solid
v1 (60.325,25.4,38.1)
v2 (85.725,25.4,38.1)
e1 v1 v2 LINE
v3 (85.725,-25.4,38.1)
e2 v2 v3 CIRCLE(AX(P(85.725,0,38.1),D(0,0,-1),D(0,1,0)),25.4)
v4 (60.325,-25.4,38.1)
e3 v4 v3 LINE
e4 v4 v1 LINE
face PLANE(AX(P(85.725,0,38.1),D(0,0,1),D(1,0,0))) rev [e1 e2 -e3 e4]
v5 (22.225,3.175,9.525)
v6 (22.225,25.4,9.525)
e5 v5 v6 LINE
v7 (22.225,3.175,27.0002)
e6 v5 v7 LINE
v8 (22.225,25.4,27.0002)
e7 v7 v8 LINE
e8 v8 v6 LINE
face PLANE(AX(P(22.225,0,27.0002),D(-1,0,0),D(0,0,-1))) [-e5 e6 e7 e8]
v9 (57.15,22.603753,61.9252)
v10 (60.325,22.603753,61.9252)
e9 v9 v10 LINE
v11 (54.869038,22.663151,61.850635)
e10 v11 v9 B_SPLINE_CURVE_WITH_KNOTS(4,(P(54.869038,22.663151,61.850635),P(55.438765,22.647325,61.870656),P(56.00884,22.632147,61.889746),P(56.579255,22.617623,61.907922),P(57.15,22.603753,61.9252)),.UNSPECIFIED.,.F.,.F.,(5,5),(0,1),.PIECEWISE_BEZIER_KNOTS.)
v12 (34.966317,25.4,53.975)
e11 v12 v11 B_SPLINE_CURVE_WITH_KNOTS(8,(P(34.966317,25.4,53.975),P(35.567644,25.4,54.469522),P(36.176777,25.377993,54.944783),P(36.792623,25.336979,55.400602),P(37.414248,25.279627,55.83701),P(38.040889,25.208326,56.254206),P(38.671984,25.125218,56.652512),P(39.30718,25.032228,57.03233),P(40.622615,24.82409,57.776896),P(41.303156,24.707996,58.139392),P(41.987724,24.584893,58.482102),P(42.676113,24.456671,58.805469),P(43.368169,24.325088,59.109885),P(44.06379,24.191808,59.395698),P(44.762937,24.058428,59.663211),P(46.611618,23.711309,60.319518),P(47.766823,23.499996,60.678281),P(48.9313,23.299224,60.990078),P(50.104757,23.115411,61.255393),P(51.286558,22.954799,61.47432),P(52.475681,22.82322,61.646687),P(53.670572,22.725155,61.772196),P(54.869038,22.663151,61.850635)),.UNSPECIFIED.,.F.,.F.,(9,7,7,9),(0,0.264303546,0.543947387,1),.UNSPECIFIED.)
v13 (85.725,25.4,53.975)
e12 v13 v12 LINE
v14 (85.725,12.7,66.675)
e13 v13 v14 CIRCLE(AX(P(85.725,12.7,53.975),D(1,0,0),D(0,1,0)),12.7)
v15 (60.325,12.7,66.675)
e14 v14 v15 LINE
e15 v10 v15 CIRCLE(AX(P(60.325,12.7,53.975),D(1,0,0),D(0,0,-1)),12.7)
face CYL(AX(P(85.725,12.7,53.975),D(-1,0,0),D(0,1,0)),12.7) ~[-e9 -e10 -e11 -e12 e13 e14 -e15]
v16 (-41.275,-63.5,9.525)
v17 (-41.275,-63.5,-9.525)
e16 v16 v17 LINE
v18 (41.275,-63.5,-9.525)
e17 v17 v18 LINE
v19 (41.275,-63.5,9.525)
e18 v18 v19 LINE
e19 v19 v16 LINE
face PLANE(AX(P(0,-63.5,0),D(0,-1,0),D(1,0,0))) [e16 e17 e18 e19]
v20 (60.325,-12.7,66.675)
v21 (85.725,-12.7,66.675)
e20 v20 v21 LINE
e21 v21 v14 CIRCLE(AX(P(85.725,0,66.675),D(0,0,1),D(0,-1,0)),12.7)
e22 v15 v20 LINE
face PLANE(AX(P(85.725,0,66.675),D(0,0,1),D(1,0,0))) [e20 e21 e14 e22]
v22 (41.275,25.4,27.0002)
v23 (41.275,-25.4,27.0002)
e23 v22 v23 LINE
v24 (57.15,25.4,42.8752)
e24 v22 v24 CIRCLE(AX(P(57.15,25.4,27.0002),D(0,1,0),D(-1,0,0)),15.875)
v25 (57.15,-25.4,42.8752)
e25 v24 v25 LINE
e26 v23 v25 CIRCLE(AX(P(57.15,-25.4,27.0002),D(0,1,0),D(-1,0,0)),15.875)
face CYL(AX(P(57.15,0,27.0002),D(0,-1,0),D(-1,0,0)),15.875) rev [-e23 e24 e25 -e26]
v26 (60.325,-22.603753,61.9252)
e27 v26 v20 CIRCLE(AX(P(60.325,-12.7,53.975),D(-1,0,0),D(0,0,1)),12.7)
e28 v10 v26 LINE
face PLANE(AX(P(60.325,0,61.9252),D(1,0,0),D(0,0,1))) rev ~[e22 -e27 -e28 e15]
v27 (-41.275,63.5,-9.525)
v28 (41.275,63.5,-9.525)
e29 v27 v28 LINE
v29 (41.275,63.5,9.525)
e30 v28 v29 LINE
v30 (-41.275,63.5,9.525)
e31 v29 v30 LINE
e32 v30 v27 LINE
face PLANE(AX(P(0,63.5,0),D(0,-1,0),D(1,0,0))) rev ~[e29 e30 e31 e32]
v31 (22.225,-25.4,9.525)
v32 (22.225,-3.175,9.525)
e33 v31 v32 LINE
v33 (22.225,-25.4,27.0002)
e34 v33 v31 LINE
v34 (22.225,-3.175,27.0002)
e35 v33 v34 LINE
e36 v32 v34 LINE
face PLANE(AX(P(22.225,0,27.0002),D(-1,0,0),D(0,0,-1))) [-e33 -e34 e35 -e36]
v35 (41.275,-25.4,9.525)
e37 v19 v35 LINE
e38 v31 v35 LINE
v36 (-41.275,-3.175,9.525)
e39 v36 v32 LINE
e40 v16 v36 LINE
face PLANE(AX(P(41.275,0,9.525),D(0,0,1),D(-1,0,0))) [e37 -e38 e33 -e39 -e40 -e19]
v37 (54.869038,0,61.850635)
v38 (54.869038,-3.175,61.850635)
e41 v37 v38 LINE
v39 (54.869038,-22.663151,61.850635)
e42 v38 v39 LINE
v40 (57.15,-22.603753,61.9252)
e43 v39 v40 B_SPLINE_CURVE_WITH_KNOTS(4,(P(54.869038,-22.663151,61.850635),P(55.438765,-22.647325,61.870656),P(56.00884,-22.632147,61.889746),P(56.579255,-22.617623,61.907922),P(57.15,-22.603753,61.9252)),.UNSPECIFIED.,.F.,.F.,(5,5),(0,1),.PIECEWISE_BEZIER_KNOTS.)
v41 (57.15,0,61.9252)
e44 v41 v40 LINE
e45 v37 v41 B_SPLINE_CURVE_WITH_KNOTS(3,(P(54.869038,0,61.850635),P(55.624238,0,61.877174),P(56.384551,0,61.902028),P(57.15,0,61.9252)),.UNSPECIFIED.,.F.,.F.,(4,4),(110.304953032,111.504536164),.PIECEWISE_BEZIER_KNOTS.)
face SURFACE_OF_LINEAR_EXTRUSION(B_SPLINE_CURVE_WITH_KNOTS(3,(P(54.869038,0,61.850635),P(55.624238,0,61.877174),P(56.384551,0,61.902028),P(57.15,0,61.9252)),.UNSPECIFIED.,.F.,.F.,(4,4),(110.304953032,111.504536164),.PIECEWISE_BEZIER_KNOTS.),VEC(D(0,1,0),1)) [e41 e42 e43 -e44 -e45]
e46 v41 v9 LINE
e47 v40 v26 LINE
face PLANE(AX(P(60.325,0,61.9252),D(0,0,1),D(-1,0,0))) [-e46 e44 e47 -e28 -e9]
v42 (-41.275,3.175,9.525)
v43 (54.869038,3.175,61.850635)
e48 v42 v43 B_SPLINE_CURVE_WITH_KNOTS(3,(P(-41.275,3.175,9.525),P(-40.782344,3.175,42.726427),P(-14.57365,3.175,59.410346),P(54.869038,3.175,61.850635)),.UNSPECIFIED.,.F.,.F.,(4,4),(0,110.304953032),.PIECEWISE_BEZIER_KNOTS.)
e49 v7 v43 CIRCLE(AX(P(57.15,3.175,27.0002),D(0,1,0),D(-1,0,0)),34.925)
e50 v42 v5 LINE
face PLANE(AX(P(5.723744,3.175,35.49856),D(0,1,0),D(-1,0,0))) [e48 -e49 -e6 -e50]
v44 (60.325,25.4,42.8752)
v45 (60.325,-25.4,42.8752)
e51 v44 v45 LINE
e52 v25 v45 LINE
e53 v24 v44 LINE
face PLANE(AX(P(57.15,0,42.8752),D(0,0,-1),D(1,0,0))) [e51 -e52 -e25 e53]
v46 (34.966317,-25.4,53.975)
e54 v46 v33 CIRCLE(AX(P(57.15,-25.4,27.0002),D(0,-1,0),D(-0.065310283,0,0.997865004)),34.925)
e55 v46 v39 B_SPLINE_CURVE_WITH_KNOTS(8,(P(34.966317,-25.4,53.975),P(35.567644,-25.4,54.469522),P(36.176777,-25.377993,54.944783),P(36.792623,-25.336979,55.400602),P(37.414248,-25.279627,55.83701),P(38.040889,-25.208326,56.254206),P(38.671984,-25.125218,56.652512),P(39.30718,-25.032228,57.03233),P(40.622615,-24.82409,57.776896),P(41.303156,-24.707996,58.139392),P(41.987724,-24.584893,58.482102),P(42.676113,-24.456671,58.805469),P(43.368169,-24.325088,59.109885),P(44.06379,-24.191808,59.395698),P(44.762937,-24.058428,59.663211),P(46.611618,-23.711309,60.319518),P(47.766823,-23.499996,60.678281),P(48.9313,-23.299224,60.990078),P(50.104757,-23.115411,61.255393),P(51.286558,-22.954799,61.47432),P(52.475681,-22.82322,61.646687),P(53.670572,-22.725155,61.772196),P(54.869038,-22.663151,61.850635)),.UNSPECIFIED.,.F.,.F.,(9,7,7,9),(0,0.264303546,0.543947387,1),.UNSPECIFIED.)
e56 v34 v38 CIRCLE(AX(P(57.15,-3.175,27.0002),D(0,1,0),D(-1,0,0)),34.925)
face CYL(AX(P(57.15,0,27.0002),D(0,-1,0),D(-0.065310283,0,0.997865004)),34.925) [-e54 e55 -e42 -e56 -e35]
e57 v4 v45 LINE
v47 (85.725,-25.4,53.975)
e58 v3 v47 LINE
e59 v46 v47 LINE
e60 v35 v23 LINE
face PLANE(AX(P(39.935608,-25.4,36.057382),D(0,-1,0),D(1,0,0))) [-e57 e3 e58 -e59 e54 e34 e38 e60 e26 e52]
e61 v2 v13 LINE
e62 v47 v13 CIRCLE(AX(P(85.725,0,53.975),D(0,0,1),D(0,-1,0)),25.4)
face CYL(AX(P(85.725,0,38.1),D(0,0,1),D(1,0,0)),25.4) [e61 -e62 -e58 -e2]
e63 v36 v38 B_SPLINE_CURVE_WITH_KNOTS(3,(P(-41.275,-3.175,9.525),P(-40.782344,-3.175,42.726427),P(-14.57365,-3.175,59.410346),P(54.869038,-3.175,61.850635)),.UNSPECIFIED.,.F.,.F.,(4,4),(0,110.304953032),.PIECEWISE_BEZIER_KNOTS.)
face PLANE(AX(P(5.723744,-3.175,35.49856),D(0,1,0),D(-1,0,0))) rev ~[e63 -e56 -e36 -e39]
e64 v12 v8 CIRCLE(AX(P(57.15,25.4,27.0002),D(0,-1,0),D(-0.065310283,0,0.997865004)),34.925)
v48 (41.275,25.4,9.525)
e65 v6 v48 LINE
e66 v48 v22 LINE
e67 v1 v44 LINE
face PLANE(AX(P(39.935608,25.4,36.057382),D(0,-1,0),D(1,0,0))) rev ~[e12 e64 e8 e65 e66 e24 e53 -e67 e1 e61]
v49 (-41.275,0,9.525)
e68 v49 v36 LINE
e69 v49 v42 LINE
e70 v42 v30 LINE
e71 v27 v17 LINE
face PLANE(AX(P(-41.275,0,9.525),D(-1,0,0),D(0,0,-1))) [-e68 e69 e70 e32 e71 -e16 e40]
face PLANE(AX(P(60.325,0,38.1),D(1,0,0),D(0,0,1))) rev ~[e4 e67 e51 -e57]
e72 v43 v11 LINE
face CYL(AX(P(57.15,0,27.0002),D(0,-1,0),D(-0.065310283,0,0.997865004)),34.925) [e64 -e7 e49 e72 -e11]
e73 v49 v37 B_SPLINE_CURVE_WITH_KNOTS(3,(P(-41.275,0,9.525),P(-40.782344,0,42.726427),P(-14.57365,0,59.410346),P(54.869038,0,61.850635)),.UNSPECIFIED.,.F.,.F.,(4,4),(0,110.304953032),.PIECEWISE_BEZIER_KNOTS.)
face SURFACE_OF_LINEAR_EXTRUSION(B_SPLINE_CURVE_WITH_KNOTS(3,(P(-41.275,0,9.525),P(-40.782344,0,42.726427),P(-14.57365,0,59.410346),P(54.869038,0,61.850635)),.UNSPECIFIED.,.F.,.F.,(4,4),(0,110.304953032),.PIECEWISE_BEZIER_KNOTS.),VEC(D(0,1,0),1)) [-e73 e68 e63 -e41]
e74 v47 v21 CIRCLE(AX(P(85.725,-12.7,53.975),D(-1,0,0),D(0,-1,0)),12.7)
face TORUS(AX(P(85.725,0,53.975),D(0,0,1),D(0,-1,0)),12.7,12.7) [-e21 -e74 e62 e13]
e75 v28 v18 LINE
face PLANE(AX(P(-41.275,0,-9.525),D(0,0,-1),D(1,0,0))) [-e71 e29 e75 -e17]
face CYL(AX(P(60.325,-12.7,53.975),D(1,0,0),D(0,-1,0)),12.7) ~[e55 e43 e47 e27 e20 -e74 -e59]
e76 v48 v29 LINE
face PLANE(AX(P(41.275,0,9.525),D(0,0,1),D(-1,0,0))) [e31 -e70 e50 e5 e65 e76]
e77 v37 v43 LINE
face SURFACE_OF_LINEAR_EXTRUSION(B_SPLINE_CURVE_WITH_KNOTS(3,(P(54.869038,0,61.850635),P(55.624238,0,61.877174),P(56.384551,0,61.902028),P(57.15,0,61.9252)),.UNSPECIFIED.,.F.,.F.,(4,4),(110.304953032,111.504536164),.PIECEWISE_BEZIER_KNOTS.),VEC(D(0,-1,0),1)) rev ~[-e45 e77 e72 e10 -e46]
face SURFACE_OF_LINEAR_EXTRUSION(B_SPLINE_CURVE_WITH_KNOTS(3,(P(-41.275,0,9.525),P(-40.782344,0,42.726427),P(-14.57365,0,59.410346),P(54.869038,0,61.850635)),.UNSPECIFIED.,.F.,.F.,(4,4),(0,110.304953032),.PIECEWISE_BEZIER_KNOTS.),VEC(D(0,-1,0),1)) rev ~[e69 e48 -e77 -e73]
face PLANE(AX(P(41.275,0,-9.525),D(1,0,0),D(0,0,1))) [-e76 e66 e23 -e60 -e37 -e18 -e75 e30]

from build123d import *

# Parameters (mm, degrees)
F1_DEPTH = 63.5
F0_W     = 25.4
F0_H     = 19.05
F0_H_2   = 4.7498
F0_H_3   = 4.7752
F2_DEPTH = 25.4
F4_DEPTH = 3.175
F5_R     = 12.7


with BuildPart() as f1:
    # F0 (on Front) → F1 (new body, symmetric)
    with BuildSketch(Plane.XZ):
        Polygon((-41.275, 9.525), (-41.275, -9.525), (41.275, -9.525), (41.275, 9.525), (22.225, 9.525), align=None)
    extrude(amount=F1_DEPTH, both=True)

    # F0 (on Front) → F2 (join, symmetric)
    with BuildSketch(Plane.XZ):
        with BuildLine():
            Line((22.225, 9.525), (41.275, 9.525))
            Line((41.275, 9.525), (41.275, 27.0002))
            ThreePointArc((41.275, 27.0002), (45.9246798487, 38.2255201513), (57.15, 42.8752))
            Line((57.15, 42.8752), (60.325, 42.8752))
            Line((60.325, 42.8752), (60.325, 61.9252))
            Line((60.325, 61.9252), (57.15, 61.9252))
            add(Edge.make_bspline(
                [(54.8690383613, 61.8506352771), (55.6242381587, 61.8771737888), (56.3845511944, 61.9020277216), (57.15, 61.9252)],
                knots=[110.3049530316, 110.3049530316, 110.3049530316, 110.3049530316, 111.5045361635, 111.5045361635, 111.5045361635, 111.5045361635], degree=3))
            ThreePointArc((54.8690383613, 61.8506352771), (31.6606079885, 50.8758470045), (22.225, 27.0002))
            Line((22.225, 27.0002), (22.225, 9.525))
        make_face()
        with Locations((73.025, 52.4002)):
            Rectangle(F0_W, F0_H)
        with Locations((73.025, 64.3001)):
            Rectangle(F0_W, F0_H_2)
        with Locations((73.025, 40.4876)):
            Rectangle(F0_W, F0_H_3)
    extrude(amount=F2_DEPTH, both=True)

    # F0 (on Front) → F3 (revolve)
    with BuildSketch(Plane.XZ):
        Polygon((85.725, 66.675), (85.725, 61.9252), (85.725, 42.8752), (85.725, 38.1), (111.125, 38.1), (111.125, 66.675), align=None)
    revolve(axis=Axis((85.725, 0, 52.3875), (0, 0, 1)))

    # F0 (on Front) → F4 (join, symmetric)
    with BuildSketch(Plane.XZ):
        with BuildLine():
            add(Edge.make_bspline(
                [(-41.275, 9.525), (-40.782344334, 42.7264267902), (-14.5736504872, 59.4103464678), (54.8690383613, 61.8506352771)],
                knots=[0, 0, 0, 0, 110.3049530316, 110.3049530316, 110.3049530316, 110.3049530316], degree=3))
            Line((-41.275, 9.525), (22.225, 9.525))
            Line((22.225, 9.525), (22.225, 27.0002))
            ThreePointArc((22.225, 27.0002), (31.6606079885, 50.8758470045), (54.8690383613, 61.8506352771))
        make_face()
    extrude(amount=F4_DEPTH, both=True)

    # F5
    f5_edges = [f1.edges().sort_by_distance(p)[0] for p in [
        (85.725, 25.4, 52.3875),
        (73.025, -25.4, 66.675),
        (73.025, 25.4, 66.675),
        (111.125, 0, 66.675),
    ]]
    fillet(f5_edges, radius=F5_R)


solid = f1.part
